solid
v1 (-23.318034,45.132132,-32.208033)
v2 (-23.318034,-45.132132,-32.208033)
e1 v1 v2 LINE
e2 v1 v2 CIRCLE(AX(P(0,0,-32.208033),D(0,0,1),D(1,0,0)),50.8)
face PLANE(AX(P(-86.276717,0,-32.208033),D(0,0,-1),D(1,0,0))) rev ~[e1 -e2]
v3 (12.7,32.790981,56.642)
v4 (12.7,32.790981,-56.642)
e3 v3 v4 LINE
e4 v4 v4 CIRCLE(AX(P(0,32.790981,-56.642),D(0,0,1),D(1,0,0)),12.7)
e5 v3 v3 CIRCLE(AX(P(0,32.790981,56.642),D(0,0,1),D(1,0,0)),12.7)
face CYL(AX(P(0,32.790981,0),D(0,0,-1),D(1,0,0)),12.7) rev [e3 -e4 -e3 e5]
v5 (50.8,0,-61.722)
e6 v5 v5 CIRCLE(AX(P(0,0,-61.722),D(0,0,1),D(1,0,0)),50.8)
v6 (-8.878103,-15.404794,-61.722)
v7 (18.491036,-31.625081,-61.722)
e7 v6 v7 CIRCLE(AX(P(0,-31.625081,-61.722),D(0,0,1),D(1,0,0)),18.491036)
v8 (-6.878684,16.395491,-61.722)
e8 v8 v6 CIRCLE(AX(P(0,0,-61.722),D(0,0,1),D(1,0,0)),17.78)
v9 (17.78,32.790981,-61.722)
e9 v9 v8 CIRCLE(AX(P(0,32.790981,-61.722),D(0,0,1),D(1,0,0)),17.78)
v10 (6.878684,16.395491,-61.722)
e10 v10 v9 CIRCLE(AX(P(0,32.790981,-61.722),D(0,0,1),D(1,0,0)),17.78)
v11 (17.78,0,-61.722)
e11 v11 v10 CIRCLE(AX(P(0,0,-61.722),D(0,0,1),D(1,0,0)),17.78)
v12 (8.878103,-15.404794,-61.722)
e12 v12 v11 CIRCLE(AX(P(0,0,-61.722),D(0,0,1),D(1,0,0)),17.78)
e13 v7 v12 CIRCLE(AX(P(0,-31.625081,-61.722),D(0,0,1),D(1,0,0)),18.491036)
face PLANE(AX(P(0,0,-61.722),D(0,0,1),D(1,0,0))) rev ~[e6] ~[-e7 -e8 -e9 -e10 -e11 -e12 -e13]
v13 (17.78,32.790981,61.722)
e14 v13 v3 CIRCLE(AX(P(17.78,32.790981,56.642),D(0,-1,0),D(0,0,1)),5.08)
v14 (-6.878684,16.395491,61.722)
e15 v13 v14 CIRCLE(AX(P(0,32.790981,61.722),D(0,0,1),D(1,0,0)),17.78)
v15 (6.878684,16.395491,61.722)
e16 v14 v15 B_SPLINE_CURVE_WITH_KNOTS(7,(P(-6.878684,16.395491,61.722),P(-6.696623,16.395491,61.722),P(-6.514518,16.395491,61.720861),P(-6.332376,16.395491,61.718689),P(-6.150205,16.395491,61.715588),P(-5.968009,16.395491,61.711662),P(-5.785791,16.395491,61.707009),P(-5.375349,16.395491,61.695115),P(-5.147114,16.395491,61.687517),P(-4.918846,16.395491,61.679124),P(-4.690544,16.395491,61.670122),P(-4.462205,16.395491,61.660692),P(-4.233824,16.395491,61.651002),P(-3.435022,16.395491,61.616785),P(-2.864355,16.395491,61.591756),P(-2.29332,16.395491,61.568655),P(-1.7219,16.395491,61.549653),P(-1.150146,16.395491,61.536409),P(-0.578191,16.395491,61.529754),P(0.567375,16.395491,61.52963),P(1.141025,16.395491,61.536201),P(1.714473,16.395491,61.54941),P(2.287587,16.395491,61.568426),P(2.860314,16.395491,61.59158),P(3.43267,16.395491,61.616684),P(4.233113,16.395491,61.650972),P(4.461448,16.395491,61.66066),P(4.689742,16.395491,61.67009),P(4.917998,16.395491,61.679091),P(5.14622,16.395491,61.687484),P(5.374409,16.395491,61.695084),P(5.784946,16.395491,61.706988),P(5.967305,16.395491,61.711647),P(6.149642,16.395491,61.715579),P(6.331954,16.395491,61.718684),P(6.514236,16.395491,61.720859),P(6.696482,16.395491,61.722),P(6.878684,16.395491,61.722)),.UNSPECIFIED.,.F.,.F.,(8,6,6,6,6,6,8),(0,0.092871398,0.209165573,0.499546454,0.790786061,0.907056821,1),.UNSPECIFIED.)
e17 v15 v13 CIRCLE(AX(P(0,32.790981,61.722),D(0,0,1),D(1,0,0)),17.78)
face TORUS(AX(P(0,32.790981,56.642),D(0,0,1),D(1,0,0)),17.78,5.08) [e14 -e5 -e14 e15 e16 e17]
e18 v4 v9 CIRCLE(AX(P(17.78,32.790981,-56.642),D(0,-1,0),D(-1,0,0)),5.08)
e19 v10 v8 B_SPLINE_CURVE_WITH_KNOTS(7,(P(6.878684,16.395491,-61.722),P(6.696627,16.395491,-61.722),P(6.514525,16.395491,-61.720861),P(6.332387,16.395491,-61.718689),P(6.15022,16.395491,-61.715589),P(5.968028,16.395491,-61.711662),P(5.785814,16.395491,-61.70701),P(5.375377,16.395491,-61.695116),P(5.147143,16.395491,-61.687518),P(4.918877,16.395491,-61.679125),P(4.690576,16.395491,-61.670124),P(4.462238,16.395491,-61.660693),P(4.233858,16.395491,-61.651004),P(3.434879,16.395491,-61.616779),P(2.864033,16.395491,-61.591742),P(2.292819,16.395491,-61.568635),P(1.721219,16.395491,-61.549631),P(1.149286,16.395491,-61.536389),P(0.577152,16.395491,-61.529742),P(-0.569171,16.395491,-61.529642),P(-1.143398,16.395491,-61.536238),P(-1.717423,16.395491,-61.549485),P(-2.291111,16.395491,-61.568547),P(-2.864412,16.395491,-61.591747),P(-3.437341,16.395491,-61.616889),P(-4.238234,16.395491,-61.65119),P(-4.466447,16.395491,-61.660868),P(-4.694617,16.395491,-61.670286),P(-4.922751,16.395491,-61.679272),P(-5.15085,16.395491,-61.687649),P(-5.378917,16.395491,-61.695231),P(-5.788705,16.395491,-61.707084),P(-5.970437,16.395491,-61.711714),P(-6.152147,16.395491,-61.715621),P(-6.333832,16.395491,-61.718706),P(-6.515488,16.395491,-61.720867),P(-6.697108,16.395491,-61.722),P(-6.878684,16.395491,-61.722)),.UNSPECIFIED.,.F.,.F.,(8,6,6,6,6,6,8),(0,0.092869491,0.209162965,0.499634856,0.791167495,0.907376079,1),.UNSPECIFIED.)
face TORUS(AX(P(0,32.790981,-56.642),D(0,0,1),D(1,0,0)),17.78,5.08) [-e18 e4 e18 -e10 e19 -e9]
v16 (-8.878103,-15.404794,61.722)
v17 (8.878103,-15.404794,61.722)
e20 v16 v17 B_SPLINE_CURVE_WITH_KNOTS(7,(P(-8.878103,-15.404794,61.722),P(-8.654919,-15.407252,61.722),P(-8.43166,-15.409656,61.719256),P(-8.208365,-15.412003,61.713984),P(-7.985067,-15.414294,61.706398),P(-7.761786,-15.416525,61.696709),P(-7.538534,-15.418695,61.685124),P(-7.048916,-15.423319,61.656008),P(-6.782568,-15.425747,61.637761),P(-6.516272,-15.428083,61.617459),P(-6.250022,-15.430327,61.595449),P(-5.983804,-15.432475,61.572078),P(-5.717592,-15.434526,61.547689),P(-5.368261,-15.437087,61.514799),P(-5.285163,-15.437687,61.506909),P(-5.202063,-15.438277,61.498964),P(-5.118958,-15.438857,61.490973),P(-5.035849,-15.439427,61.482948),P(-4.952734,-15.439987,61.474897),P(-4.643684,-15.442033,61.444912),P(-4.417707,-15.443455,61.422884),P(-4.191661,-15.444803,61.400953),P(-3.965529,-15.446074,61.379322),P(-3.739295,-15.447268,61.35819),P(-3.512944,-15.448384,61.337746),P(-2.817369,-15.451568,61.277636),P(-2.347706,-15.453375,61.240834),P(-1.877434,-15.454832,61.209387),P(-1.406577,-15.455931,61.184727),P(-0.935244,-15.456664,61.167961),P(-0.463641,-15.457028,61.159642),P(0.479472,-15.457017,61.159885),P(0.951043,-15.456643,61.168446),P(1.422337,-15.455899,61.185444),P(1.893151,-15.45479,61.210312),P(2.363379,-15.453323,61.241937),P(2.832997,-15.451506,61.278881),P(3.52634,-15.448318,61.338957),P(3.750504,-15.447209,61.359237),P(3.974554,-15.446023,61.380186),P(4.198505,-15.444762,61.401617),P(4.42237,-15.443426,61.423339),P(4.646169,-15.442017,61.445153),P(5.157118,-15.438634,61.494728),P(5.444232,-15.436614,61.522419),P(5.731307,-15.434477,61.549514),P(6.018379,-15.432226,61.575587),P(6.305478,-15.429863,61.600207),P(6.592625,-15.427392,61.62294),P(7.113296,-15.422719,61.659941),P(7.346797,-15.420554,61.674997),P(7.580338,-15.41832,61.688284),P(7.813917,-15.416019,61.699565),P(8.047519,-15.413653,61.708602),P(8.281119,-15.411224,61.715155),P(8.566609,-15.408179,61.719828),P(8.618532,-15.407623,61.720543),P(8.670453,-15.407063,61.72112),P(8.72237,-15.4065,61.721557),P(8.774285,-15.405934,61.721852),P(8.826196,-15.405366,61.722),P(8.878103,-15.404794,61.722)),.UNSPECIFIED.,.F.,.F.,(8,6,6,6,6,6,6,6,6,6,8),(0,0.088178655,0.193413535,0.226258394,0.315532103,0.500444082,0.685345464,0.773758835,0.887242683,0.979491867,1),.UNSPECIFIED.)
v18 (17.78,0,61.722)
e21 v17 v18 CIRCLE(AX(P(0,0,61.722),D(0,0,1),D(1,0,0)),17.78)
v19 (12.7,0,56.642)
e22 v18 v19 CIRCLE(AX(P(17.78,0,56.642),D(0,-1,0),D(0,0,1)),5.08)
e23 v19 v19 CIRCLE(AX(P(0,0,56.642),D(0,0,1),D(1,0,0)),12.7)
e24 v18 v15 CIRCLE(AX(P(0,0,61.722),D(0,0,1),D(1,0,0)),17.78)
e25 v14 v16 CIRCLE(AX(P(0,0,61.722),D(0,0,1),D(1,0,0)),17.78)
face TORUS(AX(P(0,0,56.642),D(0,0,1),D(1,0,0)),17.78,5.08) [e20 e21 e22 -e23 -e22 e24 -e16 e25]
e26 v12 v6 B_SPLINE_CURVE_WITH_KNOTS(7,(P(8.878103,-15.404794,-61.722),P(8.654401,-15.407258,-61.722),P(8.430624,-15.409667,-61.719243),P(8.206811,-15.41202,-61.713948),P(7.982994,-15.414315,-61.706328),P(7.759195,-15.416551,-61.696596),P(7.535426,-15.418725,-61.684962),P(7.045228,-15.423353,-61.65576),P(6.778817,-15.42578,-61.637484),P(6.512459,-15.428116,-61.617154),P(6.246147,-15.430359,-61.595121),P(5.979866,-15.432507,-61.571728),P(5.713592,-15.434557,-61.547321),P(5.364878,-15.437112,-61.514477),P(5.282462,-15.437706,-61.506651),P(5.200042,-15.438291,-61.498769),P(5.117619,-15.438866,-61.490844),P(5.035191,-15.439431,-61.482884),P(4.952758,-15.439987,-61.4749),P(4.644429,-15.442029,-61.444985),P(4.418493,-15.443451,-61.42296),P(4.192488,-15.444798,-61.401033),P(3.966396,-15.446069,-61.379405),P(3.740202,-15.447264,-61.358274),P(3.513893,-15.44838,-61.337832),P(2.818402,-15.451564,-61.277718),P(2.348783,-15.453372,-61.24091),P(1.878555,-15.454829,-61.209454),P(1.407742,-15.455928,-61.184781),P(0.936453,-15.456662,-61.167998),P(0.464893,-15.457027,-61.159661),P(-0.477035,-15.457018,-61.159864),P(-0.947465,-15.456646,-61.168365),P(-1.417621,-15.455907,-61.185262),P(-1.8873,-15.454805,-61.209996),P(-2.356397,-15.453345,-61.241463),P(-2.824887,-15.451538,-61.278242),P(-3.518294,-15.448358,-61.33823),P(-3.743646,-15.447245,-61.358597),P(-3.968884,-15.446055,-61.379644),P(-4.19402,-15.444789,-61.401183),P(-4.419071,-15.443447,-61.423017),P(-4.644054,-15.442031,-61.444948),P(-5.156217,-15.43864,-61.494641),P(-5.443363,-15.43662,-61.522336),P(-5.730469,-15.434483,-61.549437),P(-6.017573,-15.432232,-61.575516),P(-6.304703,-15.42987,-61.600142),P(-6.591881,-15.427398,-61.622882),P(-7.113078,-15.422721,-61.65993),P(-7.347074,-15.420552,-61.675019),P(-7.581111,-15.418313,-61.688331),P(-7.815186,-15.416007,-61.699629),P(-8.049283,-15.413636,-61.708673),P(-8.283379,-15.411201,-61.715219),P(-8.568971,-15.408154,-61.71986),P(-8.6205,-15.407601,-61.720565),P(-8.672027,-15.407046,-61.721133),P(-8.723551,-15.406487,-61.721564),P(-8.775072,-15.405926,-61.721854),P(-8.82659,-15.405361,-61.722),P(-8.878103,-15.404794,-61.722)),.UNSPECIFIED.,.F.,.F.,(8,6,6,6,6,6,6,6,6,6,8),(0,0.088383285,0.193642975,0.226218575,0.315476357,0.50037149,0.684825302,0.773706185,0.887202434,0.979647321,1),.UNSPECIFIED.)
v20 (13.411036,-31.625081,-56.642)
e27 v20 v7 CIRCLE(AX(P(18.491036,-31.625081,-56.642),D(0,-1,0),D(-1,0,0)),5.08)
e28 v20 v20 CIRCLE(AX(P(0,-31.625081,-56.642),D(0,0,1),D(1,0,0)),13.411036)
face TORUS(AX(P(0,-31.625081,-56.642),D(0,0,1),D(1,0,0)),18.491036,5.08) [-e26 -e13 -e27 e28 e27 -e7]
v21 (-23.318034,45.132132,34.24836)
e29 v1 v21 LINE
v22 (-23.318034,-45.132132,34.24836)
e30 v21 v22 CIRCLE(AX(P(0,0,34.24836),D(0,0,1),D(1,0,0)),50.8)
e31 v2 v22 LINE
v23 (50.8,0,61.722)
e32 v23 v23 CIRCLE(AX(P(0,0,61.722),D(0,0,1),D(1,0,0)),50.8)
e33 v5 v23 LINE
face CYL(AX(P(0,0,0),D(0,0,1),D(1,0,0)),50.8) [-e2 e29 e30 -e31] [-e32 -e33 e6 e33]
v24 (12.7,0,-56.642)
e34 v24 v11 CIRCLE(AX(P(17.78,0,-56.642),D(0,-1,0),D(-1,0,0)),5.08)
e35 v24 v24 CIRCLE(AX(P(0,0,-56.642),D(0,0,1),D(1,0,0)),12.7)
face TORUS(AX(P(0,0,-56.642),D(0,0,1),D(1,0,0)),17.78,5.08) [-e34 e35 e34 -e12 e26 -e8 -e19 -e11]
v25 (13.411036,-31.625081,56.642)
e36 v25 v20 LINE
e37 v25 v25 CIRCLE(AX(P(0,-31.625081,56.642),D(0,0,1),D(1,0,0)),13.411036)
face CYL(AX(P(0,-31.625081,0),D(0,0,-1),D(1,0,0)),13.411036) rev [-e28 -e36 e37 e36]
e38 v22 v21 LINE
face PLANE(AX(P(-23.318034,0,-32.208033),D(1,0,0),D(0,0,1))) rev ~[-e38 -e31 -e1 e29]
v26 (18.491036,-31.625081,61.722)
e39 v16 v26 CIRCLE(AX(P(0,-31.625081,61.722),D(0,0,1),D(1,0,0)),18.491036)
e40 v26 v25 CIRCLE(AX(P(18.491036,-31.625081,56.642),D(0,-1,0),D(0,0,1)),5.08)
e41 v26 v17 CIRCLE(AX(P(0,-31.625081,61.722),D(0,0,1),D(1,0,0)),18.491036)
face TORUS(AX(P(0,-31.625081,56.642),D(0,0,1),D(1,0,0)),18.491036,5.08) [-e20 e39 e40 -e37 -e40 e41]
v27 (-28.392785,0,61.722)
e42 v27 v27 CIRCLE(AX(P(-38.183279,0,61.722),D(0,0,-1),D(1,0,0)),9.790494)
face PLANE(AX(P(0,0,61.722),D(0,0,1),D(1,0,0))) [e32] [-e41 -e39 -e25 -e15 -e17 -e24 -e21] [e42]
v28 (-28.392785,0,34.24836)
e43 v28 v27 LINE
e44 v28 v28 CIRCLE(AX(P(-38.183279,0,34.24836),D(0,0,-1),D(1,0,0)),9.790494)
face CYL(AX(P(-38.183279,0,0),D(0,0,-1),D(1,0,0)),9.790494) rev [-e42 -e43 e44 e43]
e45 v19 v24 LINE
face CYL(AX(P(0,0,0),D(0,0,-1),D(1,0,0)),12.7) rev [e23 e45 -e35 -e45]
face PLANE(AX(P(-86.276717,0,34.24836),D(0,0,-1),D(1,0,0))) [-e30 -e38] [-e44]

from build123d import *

# Parameters (mm, degrees)
F0_R     = 50.8
F0_R_2   = 13.4110362239
F0_R_3   = 12.7
F1_DEPTH = 61.722
F3_W     = 62.9586838186
F3_H     = 66.4563924074
F4_DEPTH = 93.98
F5_R     = 9.7904939915
F6_DEPTH = 90.17


# Not quite as in the source:
# - a fillet or chamfer that OpenCascade refuses, or shapes differently, is made with other operations: its cross-section is extruded or revolved along the edge and cut away or added


with BuildPart() as f1:
    # F0 (on Top) → F1 (new body, symmetric)
    with BuildSketch(Plane.XY):
        Circle(F0_R)
        with Locations((0, -31.6250808537)):
            Circle(F0_R_2, mode=Mode.SUBTRACT)
        Circle(F0_R_3, mode=Mode.SUBTRACT)
        with Locations((0, 32.7909812331)):
            Circle(F0_R_3, mode=Mode.SUBTRACT)
    extrude(amount=F1_DEPTH, both=True)

    # F2: fillet of radius 5.08 on 9 edges, made by hand

    # F2_s1 → F2_t2 (revolve, cut)
    with BuildSketch(Plane.XZ.offset(31.6250808537)):
        with BuildLine():
            ThreePointArc((18.4910362239, 61.722), (14.8989337755, 60.2341024484), (13.4110362239, 56.642))
            Line((13.4110362239, 56.642), (13.4110362239, 61.722))
            Line((13.4110362239, 61.722), (18.4910362239, 61.722))
        make_face()
    revolve(axis=Axis((0, -31.6250808537, 61.722), (0, 0, 1)), mode=Mode.SUBTRACT)

    # F2_s3 → F2_t4 (revolve, cut)
    with BuildSketch(Plane.XZ.offset(31.6250808537)):
        with BuildLine():
            ThreePointArc((13.4110362239, -56.642), (14.8989337755, -60.2341024484), (18.4910362239, -61.722))
            Line((18.4910362239, -61.722), (13.4110362239, -61.722))
            Line((13.4110362239, -61.722), (13.4110362239, -56.642))
        make_face()
    revolve(axis=Axis((0, -31.6250808537, -61.722), (0, 0, 1)), mode=Mode.SUBTRACT)

    # F2_s5 → F2_t6 (revolve, cut)
    with BuildSketch(Plane.XZ):
        with BuildLine():
            ThreePointArc((17.78, 61.722), (14.1878975516, 60.2341024484), (12.7, 56.642))
            Line((12.7, 56.642), (12.7, 61.722))
            Line((12.7, 61.722), (17.78, 61.722))
        make_face()
    revolve(axis=Axis((0, 0, 61.722), (0, 0, 1)), mode=Mode.SUBTRACT)

    # F2_s7 → F2_t8 (revolve, cut)
    with BuildSketch(Plane.XZ):
        with BuildLine():
            ThreePointArc((12.7, -56.642), (14.1878975516, -60.2341024484), (17.78, -61.722))
            Line((17.78, -61.722), (12.7, -61.722))
            Line((12.7, -61.722), (12.7, -56.642))
        make_face()
    revolve(axis=Axis((0, 0, -61.722), (0, 0, 1)), mode=Mode.SUBTRACT)

    # F2_s9 → F2_t10 (revolve, cut)
    with BuildSketch(Plane.XZ.offset(-32.7909812331)):
        with BuildLine():
            ThreePointArc((17.78, 61.722), (14.1878975516, 60.2341024484), (12.7, 56.642))
            Line((12.7, 56.642), (12.7, 61.722))
            Line((12.7, 61.722), (17.78, 61.722))
        make_face()
    revolve(axis=Axis((0, 32.7909812331, 61.722), (0, 0, 1)), mode=Mode.SUBTRACT)

    # F2_s11 → F2_t12 (revolve, cut)
    with BuildSketch(Plane.XZ.offset(-32.7909812331)):
        with BuildLine():
            ThreePointArc((12.7, -56.642), (14.1878975516, -60.2341024484), (17.78, -61.722))
            Line((17.78, -61.722), (12.7, -61.722))
            Line((12.7, -61.722), (12.7, -56.642))
        make_face()
    revolve(axis=Axis((0, 32.7909812331, -61.722), (0, 0, 1)), mode=Mode.SUBTRACT)

    # F3 (on Front) → F4 (cut, symmetric)
    with BuildSketch(Plane.XZ):
        with Locations((-54.7973755747, 1.0201632977)):
            Rectangle(F3_W, F3_H)
    extrude(amount=F4_DEPTH, both=True, mode=Mode.SUBTRACT)

    # F5 (on Top) → F6 (cut)
    with BuildSketch(Plane.XY):
        with Locations((-38.1832793355, 0)):
            Circle(F5_R)
    extrude(amount=F6_DEPTH, mode=Mode.SUBTRACT)


solid = f1.part
